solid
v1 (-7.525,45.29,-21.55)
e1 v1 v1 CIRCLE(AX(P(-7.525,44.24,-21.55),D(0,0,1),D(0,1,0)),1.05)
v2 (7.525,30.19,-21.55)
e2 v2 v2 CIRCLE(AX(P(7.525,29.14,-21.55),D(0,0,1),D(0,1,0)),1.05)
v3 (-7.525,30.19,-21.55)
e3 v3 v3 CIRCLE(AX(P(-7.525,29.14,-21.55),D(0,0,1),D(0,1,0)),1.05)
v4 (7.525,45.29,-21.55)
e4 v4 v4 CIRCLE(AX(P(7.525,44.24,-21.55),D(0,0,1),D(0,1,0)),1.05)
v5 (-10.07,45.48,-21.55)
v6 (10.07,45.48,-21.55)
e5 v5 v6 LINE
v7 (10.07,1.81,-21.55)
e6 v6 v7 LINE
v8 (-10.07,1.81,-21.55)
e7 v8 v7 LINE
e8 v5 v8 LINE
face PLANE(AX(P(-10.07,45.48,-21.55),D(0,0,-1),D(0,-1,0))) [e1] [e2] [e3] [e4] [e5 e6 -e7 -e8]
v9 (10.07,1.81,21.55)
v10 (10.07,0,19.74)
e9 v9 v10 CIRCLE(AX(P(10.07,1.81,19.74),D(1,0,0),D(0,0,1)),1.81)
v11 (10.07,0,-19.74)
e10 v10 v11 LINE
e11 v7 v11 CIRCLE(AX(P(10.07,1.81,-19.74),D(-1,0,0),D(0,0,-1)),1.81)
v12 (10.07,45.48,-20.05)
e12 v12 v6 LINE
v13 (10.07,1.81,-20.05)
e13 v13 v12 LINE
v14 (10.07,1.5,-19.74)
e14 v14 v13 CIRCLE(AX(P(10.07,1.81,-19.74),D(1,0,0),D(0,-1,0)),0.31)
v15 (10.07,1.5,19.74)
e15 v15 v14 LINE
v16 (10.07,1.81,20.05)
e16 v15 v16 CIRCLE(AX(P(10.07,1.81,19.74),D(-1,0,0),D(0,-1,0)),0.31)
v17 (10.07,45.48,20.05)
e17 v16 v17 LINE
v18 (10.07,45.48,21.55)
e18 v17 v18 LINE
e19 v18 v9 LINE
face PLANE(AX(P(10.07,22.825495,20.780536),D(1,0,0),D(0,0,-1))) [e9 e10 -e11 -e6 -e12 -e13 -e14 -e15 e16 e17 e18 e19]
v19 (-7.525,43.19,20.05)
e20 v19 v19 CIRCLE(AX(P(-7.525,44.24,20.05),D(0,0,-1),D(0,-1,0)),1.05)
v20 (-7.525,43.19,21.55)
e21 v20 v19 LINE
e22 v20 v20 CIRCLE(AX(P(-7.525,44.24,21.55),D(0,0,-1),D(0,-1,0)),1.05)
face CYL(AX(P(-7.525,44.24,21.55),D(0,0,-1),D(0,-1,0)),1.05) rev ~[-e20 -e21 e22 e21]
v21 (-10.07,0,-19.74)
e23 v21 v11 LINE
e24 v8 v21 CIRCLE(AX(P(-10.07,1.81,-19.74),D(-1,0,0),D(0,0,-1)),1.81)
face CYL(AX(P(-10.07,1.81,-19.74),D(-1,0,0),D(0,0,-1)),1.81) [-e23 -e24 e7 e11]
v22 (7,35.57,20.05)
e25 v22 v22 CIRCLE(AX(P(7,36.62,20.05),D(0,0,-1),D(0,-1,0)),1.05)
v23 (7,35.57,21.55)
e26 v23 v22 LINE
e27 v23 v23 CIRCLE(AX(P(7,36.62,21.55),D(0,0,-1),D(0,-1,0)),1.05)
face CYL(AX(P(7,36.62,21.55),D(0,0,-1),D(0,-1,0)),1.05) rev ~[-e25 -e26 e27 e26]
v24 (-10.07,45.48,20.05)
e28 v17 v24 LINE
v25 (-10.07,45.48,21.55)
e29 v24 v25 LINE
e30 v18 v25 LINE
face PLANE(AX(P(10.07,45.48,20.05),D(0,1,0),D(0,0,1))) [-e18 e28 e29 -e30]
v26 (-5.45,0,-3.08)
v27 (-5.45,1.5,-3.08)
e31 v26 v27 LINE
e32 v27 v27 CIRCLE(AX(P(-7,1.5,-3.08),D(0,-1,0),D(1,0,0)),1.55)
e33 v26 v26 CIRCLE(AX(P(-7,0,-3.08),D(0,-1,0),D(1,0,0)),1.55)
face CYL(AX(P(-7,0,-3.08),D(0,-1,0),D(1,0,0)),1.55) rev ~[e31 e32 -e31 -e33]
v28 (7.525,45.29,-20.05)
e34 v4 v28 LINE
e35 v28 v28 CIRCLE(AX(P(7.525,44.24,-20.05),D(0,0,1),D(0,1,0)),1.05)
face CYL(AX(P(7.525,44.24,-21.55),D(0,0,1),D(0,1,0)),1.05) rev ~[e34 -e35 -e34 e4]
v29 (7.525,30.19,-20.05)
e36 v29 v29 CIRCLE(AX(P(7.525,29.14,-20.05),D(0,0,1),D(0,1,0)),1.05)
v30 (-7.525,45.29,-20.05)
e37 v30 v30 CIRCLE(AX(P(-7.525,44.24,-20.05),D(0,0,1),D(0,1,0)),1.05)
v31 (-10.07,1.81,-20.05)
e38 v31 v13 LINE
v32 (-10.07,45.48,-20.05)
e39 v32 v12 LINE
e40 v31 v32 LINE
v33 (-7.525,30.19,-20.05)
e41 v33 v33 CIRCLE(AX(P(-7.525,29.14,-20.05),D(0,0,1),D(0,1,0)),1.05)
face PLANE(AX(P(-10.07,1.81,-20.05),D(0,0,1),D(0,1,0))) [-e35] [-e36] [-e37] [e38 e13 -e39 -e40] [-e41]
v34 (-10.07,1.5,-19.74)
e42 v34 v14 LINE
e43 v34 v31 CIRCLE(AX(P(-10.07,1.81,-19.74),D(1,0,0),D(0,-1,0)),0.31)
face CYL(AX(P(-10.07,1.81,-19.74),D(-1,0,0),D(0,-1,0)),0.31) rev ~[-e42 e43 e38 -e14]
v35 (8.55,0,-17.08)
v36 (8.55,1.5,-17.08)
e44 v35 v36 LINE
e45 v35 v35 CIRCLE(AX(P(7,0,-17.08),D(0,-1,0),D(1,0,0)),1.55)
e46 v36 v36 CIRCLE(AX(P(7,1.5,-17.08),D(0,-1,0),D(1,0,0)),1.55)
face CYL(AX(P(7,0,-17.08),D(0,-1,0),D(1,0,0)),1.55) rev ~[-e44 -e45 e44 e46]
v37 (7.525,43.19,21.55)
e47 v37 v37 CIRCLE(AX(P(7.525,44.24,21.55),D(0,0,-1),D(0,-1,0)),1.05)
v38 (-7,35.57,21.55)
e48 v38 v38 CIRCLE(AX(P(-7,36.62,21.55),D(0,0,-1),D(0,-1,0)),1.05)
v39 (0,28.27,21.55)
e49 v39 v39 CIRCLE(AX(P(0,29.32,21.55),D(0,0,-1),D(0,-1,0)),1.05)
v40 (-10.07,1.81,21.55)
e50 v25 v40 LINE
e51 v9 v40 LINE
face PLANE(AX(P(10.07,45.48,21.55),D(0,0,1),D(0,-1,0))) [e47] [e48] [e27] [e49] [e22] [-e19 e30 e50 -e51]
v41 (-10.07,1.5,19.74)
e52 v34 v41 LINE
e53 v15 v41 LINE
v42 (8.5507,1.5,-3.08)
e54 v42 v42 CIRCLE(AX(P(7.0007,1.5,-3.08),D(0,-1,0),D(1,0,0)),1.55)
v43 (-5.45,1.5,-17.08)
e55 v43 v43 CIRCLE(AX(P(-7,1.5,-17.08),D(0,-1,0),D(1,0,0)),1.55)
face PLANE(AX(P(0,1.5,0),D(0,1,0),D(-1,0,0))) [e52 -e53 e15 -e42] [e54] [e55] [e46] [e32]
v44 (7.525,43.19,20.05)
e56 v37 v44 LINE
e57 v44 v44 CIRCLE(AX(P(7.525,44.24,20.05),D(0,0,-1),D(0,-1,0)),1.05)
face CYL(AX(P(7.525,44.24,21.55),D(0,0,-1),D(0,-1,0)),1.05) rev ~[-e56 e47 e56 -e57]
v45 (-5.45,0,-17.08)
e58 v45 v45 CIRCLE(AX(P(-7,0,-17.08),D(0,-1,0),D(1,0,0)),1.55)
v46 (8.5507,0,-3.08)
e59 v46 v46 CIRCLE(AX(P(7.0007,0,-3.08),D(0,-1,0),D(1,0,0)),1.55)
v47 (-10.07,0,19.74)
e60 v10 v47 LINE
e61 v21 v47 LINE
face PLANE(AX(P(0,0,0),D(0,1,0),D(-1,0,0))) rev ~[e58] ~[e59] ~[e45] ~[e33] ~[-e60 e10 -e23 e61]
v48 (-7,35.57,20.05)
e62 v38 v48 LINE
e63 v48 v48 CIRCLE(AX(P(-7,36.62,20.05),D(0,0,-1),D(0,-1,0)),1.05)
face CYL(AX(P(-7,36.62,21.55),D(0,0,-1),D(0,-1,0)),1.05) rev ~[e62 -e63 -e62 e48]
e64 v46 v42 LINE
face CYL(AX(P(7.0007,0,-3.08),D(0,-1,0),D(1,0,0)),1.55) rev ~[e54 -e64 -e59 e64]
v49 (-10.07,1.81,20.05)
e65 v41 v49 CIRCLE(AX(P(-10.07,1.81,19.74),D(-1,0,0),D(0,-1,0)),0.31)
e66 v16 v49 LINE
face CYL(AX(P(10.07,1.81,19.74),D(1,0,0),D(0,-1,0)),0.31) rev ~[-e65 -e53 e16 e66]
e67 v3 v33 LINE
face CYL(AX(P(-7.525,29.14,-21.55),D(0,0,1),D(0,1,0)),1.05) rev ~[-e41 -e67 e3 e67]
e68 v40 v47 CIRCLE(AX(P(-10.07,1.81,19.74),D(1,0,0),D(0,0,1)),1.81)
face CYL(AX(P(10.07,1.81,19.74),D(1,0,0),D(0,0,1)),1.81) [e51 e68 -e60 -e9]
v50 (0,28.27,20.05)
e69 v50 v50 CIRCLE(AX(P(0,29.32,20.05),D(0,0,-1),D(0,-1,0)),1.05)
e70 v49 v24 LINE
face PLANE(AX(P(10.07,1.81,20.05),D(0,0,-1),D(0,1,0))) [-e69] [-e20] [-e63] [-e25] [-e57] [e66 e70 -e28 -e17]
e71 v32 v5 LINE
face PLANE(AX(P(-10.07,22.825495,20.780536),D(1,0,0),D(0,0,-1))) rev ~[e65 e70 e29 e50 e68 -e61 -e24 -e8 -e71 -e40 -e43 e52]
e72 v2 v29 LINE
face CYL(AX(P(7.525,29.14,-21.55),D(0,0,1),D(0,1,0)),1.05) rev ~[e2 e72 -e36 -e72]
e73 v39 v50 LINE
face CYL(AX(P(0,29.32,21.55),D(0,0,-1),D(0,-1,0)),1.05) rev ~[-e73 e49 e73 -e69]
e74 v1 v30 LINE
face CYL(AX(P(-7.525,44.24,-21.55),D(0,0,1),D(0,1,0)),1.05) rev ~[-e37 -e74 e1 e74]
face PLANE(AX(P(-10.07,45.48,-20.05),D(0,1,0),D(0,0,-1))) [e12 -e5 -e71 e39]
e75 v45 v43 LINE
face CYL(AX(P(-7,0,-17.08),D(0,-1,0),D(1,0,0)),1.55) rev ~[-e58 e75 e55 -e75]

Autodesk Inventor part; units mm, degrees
ref_plane "YZ Plane" through (0, 0, 0) normal (1, 0, 0) x (0, 1, 0)
ref_plane "XZ Plane" through (0, 0, 0) normal (0, 1, 0) x (-1, 0, 0)
ref_plane "XY Plane" through (0, 0, 0) normal (0, 0, 1) x (1, 0, 0)
sketch "Sketch1" plane through (0, 0, 0) normal (0, 1, 0) x (-1, 0, 0)
  line L0 (10.07, 20.05) -> (-10.07, 20.05)
  line L1 (-10.07, 20.05) -> (-10.07, -20.05)
  line L2 (-10.07, -20.05) -> (10.07, -20.05)
  line L3 (10.07, -20.05) -> (10.07, 20.05)
  point P0 (0, 0)
  dimension "d0" = 40.1
  dimension "d1" = 20.14
  dimension "d2" = 10.07
  dimension "d3" = 20.05
extrude "Plate1" add sketch "Sketch1" along normal blind 1.5
sketch "Sketch2" plane through (10.07, 0, 21.55) normal (0, 0, -1) x (-1, 0, 0)
  line L0 (20.14, 0) -> (0, 0)
  line L1 (0, 0) -> (0, 45.48)
  line L2 (0, 45.48) -> (20.14, 45.48)
  line L3 (20.14, 45.48) -> (20.14, 0)
edge flange "Flange1" height 45.48 angle 90 thickness 1.5 bend radius 0.31 thickness toward (0, 0, -1) relief tear relief width 1.5 relief depth 0.75 corner gap 0.31 corner form 0 edges at (0, 1.5, 20.05) (0, 1.5, -20.05) wall of the first edge with corners at (-10.07, 0, 21.55) (10.07, 0, 21.55) (10.07, 45.48, 21.55) (-10.07, 45.48, 21.55)
bend "Bend1"
corner "Corner1"
sketch "Sketch3" plane through (10.07, 45.48, -21.55) normal (0, 0, -1) x (-1, 0, 0)
  circle A0 centre (17.595, -1.24) radius 0.7835 projected
  circle A1 centre (2.545, -1.24) radius 0.7835 projected
  circle A2 centre (2.545, -16.34) radius 0.7835 projected
  circle A3 centre (17.595, -16.34) radius 0.7835 projected
  point P0 (10.07, -45.48)
hole "Hole1" at (7.525, 44.24, -21.55) at (-7.525, 44.24, -21.55) at (-7.525, 29.14, -21.55) at (7.525, 29.14, -21.55) direction (0, 0, 1) diameter 2.1 depth 1.5
sketch "Sketch4" plane through (-10.07, 45.48, 21.55) normal (0, 0, 1) x (1, 0, 0)
  circle A0 centre (2.545, -1.24) radius 0.7835 projected
  circle A1 centre (17.595, -1.24) radius 0.7835 projected
  circle A2 centre (3.07, -8.86) radius 0.7835 projected
  circle A3 centre (17.07, -8.86) radius 0.7835 projected
  point P0 (10.07, -45.48)
sketch "Sketch5" plane through (-10.07, 45.48, 21.55) normal (0, 0, 1) x (1, 0, 0)
  circle A0 centre (10.07, -16.16) radius 0.7835 projected
  point P0 (10.07, -45.48)
hole "Hole2" at (-7.525, 44.24, 21.55) at (7.525, 44.24, 21.55) at (-7, 36.62, 21.55) at (7, 36.62, 21.55) direction (0, 0, -1) diameter 2.1 depth 1.5
hole "Hole3" at (0, 29.32, 21.55) direction (0, 0, -1) diameter 2.1 depth 1.5
sketch "Sketch6" plane through (0, 0, 0) normal (0, -1, 0) x (1, 0, 0)
  circle A0 centre (7.0007, -3.08) radius 1.55
  circle A1 centre (7, -17.08) radius 1.55
  circle A2 centre (-7, -17.08) radius 1.55
  circle A3 centre (-7, -3.08) radius 1.55
  point P0 (0, 0)
extrude "Cut1" cut sketch "Sketch6" against normal blind 1.5
equation "\"d20\" = Thickness"
equation "\"d27\" = Thickness"
equation "\"d34\" = Thickness"
equation "\"d36\" = Thickness"
equation "\"d4\" = Thickness"
equation "\"d5\" = BendReliefWidth"
equation "\"d6\" = BendReliefDepth"
equation "\"d7\" = MinimumRemnant"
equation "\"d8\" = TransitionRadius"
equation "\"d11\" = BendRadius"
equation "\"d12\" = CornerReliefSize"
equation "\"d13\" = GapSize"
equation "\"d14\" = JacobiRadiusSize"
equation "\"BendReliefWidth\" = Thickness"
equation "\"BendReliefDepth\" = 0.5 * Thickness"
equation "\"CornerReliefSize\" = 4 * Thickness"
equation "\"MinimumRemnant\" = 2 * Thickness"
equation "\"TransitionRadius\" = BendRadius"
equation "\"JacobiRadiusSize\" = BendRadius"
equation "\"GapSize\" = Thickness"
equation "\"Thickness\" = 1.5"
equation "\"BendRadius\" = 0.31"
properties part number "axis_25_top_frame" material "Aluminum 6061-AHC"
